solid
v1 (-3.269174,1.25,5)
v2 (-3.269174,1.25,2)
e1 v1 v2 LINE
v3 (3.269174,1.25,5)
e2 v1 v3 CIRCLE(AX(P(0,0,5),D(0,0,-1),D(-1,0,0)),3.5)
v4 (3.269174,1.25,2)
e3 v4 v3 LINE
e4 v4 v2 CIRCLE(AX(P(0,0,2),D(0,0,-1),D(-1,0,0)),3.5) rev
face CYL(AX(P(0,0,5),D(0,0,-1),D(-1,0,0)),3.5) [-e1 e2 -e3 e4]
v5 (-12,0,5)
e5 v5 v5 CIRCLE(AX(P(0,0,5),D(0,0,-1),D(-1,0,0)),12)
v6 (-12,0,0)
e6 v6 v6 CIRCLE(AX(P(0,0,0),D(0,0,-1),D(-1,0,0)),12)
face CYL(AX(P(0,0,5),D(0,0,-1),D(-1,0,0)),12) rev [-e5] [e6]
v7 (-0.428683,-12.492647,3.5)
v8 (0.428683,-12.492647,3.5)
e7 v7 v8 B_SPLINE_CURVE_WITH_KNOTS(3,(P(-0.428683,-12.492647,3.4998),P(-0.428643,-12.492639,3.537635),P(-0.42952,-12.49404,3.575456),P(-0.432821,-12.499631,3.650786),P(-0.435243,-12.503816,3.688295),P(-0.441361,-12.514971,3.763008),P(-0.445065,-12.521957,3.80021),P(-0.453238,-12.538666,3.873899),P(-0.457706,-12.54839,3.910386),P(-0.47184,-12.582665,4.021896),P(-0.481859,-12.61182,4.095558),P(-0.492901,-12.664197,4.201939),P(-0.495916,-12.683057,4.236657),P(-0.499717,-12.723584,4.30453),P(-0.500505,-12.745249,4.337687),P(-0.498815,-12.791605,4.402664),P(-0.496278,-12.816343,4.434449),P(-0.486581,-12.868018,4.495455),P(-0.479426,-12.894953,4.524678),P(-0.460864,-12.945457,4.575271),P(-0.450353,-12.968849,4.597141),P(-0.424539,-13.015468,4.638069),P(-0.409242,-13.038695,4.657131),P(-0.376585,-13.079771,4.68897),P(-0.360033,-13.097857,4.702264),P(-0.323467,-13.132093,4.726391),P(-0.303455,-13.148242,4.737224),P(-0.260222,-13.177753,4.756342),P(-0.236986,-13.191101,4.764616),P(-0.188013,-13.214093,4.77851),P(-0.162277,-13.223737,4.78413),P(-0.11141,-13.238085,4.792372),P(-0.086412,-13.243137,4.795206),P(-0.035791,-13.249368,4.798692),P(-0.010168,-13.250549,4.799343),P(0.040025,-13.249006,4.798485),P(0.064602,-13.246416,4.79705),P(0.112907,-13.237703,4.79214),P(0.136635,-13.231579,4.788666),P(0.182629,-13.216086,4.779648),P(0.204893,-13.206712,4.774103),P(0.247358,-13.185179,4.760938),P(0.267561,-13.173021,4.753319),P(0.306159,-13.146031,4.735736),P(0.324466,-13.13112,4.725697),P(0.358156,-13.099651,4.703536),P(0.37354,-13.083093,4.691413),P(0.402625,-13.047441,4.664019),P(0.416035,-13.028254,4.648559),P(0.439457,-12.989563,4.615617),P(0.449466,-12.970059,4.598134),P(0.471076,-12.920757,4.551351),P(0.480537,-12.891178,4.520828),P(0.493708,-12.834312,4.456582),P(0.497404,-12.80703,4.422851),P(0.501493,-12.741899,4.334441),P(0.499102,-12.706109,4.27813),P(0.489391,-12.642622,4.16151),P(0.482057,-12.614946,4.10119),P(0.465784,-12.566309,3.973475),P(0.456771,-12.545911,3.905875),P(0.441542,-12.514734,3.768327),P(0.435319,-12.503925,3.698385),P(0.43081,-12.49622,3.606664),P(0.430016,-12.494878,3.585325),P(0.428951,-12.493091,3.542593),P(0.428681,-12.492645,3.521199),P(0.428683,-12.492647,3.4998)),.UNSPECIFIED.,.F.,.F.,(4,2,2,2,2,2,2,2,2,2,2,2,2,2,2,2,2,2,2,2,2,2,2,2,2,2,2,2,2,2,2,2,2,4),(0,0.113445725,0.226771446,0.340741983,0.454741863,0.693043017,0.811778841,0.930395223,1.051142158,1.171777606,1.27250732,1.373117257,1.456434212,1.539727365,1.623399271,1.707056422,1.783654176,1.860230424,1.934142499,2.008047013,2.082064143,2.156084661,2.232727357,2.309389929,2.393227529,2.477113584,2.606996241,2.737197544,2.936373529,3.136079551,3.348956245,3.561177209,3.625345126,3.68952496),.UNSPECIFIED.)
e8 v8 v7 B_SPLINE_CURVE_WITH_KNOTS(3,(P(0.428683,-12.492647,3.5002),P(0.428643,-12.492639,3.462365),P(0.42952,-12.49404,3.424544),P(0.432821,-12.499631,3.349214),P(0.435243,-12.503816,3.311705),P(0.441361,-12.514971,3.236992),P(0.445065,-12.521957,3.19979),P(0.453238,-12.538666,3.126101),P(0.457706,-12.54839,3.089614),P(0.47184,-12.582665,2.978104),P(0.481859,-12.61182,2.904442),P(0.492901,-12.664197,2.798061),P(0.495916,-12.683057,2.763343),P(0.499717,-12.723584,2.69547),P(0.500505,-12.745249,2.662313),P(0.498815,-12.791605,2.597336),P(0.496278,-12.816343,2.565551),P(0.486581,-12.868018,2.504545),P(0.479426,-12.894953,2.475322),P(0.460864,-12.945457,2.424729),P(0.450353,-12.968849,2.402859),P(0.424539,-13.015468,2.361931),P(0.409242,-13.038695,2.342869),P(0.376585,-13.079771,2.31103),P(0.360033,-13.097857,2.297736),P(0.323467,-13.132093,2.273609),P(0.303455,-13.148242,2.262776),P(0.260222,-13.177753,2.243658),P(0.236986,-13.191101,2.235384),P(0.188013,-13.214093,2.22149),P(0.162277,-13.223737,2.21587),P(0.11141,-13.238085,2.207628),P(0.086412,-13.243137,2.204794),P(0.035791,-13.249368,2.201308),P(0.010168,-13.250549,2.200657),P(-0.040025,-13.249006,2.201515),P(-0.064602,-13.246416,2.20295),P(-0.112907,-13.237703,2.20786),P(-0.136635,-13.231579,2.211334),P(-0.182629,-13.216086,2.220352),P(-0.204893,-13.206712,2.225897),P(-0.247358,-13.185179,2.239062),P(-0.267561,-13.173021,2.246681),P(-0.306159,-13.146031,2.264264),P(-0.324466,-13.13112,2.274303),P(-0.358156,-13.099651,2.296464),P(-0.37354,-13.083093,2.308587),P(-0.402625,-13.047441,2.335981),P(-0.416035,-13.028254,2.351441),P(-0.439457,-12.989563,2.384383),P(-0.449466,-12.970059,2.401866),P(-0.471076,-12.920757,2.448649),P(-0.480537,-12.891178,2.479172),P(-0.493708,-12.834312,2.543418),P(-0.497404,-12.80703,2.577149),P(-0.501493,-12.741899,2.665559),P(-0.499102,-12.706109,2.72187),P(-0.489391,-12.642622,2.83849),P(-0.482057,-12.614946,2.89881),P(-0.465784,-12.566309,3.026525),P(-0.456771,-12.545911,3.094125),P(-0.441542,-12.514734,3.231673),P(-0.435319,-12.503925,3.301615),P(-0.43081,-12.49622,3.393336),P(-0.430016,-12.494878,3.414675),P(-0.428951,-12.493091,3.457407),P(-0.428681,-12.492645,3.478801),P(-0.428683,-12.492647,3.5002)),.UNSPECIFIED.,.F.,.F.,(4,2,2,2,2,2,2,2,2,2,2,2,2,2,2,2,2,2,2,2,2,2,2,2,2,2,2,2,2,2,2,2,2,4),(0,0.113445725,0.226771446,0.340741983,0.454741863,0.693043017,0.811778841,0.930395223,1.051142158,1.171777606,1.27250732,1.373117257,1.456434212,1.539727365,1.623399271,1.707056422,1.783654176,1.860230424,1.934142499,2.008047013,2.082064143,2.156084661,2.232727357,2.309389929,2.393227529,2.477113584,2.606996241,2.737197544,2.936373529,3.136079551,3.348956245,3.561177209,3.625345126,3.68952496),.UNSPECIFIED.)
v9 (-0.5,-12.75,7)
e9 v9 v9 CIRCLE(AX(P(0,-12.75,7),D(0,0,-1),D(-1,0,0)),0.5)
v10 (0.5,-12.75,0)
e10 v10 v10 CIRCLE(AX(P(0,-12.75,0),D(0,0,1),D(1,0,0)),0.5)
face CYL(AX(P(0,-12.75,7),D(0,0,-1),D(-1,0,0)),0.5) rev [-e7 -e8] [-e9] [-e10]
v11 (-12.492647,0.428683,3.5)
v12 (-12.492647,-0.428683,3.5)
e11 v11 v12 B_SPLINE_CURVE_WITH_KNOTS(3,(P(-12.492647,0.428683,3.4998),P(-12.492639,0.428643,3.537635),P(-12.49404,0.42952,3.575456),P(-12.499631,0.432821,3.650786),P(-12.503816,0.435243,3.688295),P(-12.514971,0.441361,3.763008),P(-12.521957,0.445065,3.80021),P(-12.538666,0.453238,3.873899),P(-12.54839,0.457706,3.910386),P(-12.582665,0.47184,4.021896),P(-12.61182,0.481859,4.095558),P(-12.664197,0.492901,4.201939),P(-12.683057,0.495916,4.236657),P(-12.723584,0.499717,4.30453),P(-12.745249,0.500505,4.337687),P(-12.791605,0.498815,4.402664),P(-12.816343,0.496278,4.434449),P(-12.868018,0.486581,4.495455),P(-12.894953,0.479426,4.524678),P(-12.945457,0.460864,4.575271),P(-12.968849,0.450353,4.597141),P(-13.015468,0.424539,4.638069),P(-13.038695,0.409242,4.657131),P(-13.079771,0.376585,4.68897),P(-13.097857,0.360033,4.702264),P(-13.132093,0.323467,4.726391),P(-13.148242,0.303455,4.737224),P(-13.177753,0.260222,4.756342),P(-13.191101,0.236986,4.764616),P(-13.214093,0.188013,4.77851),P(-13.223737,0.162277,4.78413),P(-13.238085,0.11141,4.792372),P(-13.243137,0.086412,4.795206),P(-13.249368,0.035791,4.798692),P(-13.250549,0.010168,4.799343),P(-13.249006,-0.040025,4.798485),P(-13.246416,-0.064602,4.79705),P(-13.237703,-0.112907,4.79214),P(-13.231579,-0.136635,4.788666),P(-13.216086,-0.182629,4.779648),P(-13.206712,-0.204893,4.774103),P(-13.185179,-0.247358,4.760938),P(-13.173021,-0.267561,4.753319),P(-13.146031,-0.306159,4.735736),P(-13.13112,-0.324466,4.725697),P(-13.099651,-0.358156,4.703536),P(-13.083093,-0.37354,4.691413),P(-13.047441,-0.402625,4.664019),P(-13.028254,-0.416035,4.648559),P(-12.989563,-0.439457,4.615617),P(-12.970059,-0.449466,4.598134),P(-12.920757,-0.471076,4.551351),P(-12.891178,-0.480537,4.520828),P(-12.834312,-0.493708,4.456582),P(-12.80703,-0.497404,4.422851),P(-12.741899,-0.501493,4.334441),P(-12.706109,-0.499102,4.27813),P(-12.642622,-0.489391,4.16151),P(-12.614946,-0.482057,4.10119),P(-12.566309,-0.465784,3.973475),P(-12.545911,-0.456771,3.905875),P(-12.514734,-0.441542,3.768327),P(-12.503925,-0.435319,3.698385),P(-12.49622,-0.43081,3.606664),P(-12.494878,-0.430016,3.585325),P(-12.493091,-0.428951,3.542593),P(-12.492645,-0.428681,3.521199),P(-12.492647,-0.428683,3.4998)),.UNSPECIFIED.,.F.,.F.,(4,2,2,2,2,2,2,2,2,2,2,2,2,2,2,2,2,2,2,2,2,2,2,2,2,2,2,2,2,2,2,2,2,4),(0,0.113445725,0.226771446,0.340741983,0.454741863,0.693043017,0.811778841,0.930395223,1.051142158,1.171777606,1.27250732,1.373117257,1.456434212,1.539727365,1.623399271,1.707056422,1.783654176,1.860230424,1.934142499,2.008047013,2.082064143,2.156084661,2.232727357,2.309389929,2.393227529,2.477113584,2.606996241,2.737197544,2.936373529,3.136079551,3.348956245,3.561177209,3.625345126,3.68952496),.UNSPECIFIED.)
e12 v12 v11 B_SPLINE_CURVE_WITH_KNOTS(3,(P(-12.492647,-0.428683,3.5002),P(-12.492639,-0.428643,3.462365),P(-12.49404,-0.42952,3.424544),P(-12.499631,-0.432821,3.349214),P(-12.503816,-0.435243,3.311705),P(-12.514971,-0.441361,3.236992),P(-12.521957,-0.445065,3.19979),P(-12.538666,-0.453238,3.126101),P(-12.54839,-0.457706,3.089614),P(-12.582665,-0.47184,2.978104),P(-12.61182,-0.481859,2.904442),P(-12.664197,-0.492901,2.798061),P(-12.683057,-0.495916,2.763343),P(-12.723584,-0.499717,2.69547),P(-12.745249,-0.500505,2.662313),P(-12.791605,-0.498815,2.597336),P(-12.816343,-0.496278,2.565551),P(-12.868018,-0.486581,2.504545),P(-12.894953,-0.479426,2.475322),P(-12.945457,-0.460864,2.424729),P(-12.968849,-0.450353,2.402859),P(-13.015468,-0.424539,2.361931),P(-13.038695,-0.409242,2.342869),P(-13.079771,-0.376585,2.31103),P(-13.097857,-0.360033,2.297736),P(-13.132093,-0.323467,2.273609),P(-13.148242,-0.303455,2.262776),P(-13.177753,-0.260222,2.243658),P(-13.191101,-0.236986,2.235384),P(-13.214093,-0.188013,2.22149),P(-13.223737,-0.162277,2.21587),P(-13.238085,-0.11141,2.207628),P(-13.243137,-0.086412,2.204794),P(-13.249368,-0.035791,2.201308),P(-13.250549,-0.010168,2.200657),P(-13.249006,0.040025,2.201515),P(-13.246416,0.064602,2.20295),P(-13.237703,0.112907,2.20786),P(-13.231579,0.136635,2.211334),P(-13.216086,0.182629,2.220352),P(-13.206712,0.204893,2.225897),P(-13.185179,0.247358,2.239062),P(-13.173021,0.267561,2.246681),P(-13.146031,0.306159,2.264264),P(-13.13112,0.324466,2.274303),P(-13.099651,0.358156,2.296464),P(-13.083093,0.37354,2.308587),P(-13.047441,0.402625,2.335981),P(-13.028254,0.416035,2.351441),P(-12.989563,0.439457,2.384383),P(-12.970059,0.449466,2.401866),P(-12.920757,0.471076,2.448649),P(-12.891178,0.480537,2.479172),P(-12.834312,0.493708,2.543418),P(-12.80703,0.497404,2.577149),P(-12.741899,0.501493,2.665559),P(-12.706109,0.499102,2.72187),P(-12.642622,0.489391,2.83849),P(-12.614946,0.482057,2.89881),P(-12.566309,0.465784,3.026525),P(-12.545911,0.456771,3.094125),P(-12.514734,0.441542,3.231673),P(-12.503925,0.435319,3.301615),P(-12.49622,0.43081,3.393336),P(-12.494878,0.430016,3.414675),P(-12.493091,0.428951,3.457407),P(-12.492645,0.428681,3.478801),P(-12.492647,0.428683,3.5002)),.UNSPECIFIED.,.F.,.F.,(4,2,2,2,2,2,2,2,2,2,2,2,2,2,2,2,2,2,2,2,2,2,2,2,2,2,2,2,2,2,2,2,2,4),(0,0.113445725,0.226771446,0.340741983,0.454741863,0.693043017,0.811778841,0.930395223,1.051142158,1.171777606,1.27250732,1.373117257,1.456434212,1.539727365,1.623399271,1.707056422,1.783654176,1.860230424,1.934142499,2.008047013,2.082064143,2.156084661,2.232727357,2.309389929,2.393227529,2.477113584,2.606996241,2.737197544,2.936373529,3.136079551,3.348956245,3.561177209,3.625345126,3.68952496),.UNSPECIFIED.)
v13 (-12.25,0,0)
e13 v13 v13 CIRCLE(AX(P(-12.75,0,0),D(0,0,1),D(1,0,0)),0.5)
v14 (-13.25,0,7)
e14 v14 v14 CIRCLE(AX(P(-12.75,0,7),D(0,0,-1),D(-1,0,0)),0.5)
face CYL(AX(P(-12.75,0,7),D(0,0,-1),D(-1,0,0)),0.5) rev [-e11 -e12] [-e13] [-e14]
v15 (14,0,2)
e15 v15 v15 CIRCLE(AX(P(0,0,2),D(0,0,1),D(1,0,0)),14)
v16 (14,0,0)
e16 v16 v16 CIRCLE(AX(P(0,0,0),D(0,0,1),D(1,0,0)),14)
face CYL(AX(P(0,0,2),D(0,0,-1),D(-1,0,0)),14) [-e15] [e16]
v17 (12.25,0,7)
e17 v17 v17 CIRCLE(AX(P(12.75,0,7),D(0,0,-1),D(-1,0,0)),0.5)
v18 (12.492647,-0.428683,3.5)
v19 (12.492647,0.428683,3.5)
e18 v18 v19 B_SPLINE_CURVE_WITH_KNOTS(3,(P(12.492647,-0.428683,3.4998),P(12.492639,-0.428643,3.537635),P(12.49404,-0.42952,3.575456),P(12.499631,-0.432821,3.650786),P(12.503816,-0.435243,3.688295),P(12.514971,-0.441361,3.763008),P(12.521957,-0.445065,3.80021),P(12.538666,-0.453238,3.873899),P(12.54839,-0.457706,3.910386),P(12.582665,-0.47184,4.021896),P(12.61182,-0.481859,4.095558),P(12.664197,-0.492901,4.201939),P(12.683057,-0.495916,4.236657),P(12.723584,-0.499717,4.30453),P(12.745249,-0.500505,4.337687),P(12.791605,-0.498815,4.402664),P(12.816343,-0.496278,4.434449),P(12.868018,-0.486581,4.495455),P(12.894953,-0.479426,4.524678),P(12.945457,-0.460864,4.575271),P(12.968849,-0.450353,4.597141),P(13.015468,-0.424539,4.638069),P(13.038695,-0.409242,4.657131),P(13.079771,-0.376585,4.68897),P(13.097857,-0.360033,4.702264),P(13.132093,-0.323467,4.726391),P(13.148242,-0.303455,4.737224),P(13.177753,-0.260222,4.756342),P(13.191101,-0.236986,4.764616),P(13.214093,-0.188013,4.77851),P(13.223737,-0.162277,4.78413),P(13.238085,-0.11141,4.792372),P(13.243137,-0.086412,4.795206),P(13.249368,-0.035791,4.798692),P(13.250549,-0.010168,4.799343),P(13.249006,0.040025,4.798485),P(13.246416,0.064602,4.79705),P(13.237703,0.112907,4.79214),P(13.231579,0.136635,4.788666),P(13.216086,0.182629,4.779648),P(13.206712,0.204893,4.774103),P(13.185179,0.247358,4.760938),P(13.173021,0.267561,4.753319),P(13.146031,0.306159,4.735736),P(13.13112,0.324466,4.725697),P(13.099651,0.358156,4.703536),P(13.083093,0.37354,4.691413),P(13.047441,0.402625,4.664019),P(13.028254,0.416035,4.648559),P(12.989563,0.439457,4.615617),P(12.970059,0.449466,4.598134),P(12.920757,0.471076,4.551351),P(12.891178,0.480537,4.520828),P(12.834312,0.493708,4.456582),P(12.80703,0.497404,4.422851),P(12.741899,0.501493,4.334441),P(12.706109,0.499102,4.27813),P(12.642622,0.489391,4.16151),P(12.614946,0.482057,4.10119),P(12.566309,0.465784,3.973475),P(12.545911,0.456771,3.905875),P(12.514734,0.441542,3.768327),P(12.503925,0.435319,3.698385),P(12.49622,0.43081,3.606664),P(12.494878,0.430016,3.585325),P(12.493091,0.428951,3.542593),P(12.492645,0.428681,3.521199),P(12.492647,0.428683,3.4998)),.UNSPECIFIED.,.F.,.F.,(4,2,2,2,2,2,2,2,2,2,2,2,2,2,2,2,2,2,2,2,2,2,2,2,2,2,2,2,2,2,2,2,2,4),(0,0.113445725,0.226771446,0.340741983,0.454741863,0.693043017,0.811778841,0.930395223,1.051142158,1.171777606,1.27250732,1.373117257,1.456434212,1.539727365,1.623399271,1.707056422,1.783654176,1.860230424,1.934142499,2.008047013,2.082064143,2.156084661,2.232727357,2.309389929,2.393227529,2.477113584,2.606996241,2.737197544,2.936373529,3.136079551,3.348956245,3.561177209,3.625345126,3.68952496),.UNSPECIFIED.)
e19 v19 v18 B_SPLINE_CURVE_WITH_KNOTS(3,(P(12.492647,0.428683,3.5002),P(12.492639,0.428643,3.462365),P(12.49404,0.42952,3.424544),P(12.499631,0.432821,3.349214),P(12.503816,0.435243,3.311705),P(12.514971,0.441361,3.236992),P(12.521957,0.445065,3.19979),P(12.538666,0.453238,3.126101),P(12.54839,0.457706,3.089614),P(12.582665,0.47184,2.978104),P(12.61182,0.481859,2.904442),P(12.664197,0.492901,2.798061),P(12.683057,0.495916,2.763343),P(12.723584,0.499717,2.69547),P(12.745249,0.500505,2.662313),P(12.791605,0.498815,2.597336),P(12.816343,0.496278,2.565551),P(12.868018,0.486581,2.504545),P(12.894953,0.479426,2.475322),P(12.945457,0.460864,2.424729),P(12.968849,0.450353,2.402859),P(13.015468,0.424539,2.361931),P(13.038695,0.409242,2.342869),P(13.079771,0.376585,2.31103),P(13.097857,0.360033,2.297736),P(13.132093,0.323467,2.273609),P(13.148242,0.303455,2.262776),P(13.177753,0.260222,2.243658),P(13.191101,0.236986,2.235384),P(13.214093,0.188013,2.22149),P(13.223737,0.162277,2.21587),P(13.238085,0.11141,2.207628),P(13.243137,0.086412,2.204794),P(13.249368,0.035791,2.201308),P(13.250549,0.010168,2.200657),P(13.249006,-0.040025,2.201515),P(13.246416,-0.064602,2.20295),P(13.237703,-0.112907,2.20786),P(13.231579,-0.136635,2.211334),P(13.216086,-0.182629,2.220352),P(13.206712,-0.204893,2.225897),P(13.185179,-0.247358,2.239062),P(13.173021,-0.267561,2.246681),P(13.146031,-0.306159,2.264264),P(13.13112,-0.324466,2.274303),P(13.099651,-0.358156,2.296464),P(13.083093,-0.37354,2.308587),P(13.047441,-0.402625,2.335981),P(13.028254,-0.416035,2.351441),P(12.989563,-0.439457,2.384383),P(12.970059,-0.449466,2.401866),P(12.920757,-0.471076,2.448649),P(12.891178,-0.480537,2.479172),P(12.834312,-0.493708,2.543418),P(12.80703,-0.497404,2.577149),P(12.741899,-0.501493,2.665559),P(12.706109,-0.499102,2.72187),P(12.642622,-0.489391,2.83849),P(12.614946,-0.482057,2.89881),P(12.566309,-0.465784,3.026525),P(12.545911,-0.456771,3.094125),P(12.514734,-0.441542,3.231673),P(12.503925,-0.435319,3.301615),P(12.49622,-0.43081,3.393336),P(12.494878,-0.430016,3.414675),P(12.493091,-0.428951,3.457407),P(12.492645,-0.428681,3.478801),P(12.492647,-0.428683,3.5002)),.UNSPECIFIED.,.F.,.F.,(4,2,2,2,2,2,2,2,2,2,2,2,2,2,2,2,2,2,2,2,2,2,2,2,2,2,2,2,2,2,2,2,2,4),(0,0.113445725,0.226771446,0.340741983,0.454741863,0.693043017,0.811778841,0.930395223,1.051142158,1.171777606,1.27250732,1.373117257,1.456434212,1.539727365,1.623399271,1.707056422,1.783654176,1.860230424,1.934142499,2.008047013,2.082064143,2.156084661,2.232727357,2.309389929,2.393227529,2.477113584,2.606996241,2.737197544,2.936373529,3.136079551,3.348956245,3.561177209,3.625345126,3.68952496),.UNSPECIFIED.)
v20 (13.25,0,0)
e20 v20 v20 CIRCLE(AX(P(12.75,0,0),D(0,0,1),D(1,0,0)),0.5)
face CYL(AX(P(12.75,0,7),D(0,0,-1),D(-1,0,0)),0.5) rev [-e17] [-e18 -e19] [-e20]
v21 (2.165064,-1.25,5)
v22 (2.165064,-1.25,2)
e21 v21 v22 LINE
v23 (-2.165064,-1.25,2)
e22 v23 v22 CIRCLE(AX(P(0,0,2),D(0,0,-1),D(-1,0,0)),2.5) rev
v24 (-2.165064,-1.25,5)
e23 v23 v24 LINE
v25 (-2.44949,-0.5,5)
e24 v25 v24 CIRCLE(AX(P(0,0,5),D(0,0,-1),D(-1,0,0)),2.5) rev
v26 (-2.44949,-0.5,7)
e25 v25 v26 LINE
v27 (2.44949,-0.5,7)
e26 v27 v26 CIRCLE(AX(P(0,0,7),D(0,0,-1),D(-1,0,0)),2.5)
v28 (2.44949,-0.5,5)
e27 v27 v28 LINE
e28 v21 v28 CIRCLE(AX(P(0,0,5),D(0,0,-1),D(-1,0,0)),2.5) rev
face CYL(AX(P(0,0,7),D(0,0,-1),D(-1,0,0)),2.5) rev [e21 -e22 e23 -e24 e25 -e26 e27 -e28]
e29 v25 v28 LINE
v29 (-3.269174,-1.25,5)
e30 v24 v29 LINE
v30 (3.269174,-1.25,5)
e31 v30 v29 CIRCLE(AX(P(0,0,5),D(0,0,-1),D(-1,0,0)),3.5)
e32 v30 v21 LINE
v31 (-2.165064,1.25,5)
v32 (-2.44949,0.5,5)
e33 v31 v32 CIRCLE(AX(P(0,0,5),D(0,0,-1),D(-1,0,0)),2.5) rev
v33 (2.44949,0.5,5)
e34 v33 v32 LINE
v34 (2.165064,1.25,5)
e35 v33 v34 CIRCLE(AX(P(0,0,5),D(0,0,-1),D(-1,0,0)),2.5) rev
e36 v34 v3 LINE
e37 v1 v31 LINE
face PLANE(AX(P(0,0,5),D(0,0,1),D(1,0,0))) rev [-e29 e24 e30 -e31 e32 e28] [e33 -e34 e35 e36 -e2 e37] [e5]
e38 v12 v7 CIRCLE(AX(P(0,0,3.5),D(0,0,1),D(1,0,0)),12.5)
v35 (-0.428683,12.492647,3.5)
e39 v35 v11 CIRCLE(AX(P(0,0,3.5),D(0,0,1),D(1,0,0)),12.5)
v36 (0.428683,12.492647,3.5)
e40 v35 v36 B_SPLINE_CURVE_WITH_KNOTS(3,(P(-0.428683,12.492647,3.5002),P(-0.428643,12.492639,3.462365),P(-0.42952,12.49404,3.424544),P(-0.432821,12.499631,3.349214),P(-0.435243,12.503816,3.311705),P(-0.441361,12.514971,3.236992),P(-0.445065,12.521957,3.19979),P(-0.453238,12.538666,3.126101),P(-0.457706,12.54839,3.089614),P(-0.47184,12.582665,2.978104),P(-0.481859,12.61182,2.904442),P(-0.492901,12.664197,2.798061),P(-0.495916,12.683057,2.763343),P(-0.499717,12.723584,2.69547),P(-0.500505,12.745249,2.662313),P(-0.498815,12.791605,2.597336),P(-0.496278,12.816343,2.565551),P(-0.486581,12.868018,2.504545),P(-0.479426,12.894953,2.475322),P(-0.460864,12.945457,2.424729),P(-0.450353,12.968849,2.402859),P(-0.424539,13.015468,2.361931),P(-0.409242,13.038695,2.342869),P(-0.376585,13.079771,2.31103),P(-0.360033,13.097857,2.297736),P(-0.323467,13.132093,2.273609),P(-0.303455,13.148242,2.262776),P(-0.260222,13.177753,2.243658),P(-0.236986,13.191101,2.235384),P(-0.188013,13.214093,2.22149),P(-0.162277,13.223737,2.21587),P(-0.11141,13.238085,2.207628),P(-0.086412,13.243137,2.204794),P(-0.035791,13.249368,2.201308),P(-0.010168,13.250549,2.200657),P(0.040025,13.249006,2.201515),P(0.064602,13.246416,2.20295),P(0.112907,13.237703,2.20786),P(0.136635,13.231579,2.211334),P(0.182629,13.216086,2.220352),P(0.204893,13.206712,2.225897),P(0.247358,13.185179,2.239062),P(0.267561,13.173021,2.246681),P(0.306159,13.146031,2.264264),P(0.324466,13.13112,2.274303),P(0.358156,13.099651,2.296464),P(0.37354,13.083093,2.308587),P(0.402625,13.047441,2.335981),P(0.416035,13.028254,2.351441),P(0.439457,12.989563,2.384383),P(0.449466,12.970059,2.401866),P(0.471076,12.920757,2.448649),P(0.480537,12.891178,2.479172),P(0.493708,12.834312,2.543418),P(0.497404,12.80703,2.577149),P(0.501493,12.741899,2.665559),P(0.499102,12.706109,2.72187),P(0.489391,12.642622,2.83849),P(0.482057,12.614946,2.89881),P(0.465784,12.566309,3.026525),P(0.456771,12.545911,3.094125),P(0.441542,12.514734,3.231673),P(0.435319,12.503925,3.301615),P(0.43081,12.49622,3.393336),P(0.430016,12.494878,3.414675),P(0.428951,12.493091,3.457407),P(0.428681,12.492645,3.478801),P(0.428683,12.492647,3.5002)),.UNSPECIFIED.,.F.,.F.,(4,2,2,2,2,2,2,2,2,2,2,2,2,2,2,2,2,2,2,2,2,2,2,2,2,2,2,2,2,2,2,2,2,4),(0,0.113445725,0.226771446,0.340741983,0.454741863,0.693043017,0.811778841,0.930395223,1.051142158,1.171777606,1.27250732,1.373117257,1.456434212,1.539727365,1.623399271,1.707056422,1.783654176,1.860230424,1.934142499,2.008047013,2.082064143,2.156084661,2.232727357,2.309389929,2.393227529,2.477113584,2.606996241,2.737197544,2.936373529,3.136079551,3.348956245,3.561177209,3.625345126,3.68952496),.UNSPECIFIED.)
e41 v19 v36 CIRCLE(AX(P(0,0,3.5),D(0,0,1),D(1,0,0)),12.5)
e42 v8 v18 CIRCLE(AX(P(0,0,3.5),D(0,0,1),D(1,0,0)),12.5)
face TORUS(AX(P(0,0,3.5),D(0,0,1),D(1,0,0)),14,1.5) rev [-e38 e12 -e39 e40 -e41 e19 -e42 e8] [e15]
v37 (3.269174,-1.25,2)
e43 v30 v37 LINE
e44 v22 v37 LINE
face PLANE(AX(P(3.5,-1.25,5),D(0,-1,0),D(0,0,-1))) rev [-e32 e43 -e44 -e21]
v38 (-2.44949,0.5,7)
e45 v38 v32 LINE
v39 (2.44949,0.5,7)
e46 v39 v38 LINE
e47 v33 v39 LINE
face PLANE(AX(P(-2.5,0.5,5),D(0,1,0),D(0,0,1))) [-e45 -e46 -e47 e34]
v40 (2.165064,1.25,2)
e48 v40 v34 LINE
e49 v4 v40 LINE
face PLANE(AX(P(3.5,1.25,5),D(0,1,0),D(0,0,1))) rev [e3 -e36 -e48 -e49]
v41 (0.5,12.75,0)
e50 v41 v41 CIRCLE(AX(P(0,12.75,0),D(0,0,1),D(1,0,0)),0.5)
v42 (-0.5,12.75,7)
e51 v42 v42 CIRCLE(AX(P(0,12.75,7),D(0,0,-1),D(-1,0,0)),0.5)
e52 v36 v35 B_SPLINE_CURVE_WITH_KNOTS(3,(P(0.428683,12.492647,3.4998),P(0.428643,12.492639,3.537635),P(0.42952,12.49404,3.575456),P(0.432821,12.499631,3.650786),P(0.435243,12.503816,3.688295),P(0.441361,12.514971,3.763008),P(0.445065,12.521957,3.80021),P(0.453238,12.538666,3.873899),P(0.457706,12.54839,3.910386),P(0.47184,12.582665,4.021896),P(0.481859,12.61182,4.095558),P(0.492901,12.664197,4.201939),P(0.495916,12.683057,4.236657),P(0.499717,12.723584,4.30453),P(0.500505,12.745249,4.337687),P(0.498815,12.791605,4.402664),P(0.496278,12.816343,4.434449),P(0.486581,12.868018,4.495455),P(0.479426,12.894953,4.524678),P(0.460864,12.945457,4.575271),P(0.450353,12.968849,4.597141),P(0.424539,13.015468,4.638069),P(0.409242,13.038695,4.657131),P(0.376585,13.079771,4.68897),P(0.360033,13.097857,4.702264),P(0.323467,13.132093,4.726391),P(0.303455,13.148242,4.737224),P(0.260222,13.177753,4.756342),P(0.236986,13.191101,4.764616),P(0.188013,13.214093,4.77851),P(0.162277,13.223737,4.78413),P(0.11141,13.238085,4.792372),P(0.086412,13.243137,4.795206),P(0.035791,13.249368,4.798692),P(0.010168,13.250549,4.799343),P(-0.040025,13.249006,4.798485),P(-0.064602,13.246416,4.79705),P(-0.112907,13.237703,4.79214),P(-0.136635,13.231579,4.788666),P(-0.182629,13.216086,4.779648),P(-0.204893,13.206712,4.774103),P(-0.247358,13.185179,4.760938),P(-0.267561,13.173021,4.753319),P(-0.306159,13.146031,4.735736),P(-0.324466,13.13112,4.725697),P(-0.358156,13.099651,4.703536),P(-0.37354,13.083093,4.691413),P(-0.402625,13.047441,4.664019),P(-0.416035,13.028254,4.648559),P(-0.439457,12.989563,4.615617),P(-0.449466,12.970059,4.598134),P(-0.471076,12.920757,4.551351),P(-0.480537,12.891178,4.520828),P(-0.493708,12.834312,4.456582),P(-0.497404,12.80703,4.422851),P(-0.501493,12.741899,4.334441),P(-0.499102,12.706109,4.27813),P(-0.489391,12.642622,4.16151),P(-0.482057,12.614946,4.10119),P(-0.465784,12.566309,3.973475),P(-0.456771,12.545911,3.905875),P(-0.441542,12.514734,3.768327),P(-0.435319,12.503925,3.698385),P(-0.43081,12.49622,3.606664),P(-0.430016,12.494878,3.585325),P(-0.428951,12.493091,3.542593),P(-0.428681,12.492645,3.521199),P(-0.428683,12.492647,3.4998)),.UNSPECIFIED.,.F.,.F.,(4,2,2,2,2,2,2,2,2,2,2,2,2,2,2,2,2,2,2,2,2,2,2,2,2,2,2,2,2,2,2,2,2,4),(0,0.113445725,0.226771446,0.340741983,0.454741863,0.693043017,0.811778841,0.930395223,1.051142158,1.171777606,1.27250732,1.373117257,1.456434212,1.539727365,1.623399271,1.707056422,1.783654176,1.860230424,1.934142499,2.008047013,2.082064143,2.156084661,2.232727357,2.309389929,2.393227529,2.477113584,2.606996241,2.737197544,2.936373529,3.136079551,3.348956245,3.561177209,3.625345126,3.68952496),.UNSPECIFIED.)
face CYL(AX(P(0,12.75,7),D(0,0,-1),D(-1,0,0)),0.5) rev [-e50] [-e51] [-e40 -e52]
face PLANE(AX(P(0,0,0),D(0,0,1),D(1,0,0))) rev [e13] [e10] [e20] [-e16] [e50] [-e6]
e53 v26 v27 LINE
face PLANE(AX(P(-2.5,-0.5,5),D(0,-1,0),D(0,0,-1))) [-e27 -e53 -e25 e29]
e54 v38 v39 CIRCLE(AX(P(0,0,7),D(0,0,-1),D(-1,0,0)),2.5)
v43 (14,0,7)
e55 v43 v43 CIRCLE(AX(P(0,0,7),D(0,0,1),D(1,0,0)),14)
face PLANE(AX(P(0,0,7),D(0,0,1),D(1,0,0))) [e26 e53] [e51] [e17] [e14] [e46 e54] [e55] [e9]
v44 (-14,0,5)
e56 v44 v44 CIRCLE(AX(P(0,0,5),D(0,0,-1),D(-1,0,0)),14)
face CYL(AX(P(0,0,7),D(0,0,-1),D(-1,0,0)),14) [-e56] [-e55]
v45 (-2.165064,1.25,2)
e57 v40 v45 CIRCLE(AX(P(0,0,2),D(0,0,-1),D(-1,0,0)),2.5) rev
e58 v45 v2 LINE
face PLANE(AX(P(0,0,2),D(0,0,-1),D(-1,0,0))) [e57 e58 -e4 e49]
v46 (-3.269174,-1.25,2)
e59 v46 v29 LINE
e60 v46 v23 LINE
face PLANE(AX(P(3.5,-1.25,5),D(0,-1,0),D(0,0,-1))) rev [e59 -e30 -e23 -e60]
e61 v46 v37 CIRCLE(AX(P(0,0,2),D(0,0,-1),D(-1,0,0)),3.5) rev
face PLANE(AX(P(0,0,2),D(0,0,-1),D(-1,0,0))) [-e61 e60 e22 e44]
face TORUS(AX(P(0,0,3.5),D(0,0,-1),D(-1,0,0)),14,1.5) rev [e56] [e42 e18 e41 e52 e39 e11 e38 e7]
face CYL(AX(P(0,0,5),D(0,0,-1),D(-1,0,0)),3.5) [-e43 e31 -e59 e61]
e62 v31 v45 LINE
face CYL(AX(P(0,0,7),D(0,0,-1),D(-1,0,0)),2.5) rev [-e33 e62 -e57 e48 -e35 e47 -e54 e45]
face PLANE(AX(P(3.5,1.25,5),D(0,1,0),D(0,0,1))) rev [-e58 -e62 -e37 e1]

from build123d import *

# Parameters (mm, degrees)
SKETCH1_R               = 14
BOSS_EXTRUDE1_DEPTH     = 7
SKETCH3_R               = 2.5
CUT_EXTRUDE1_DEPTH      = 22
SKETCH4_W               = 5
SKETCH4_H               = 1
BOSS_EXTRUDE2_DEPTH     = 2
SKETCH5_R               = 12
SKETCH5_R_2             = 3.5
CUT_EXTRUDE2_DEPTH      = 5
SKETCH6_W               = 7
SKETCH6_H               = 2.5
CUT_EXTRUDE3_DEPTH      = 5
SKETCH7_R               = 14
SKETCH7_R_2             = 12.5
CUT_EXTRUDE4_DEPTH      = 5
SKETCH8_R               = 14
SKETCH8_R_2             = 12.5
BOSS_EXTRUDE3_DEPTH     = 2
FILLET1_R               = 1.5
CUT_EXTRUDE7_DEPTH      = 22
CUT_EXTRUDE7_DEPTH_BACK = 22
SKETCH9_R               = 0.5
SKETCH10_W              = 6.874413596
SKETCH10_H              = 7.54594332
CUT_EXTRUDE8_DEPTH      = 2


with BuildPart() as part:
    # Sketch1 → Boss-Extrude1 (new body)
    with BuildSketch(Plane.XY):
        Circle(SKETCH1_R)
    extrude(amount=BOSS_EXTRUDE1_DEPTH)

    # Sketch3 → Cut-Extrude1 (cut, through all)
    with BuildSketch(Plane(origin=(0, 0, 0), x_dir=(-1, 0, 0), z_dir=(0, 0, -1))):
        Circle(SKETCH3_R)
    extrude(amount=-CUT_EXTRUDE1_DEPTH, mode=Mode.SUBTRACT)

    # Sketch4 → Boss-Extrude2 (add)
    with BuildSketch(Plane.XY.offset(7)):
        Rectangle(SKETCH4_W, SKETCH4_H)
    extrude(amount=-BOSS_EXTRUDE2_DEPTH)

    # Sketch5 → Cut-Extrude2 (cut)
    with BuildSketch(Plane(origin=(0, 0, 0), x_dir=(-1, 0, 0), z_dir=(0, 0, -1))):
        Circle(SKETCH5_R)
        Circle(SKETCH5_R_2, mode=Mode.SUBTRACT)
    extrude(amount=-CUT_EXTRUDE2_DEPTH, mode=Mode.SUBTRACT)

    # Sketch6 → Cut-Extrude3 (cut)
    with BuildSketch(Plane(origin=(0, 0, 0), x_dir=(-1, 0, 0), z_dir=(0, 0, -1))):
        Rectangle(SKETCH6_W, SKETCH6_H)
    extrude(amount=-CUT_EXTRUDE3_DEPTH, mode=Mode.SUBTRACT)

    # Sketch7 → Cut-Extrude4 (cut)
    with BuildSketch(Plane(origin=(0, 0, 0), x_dir=(-1, 0, 0), z_dir=(0, 0, -1))):
        Circle(SKETCH7_R)
        Circle(SKETCH7_R_2, mode=Mode.SUBTRACT)
    extrude(amount=-CUT_EXTRUDE4_DEPTH, mode=Mode.SUBTRACT)

    # Sketch8 → Boss-Extrude3 (add)
    with BuildSketch(Plane.XY):
        with Locations(Location((0, 0, 0), (0, 0, 180))):
            Circle(SKETCH8_R)
        with Locations(Location((0, 0, 0), (0, 0, 180))):
            Circle(SKETCH8_R_2, mode=Mode.SUBTRACT)
    extrude(amount=BOSS_EXTRUDE3_DEPTH)

    # Fillet1
    fillet1_edges = [part.edges().sort_by_distance(p)[0] for p in [
        (12.5, 0, 5),
        (12.5, 0, 2),
    ]]
    fillet(fillet1_edges, radius=FILLET1_R - 0.0001)  # a hair under: the kernel refuses the full size

    # Sketch9 → Cut-Extrude7 (cut, two sides: drawn at the far end of the back side and taken through both)
    with BuildSketch(Plane(origin=(0, 0, 0), x_dir=(-1, 0, 0), z_dir=(0, 0, -1)).offset(-CUT_EXTRUDE7_DEPTH_BACK)):
        with Locations((-12.75, 0)):
            Circle(SKETCH9_R)
        with Locations((12.75, 0)):
            Circle(SKETCH9_R)
        with Locations((0, 12.75)):
            Circle(SKETCH9_R)
        with Locations((0, -12.75)):
            Circle(SKETCH9_R)
    extrude(amount=CUT_EXTRUDE7_DEPTH + CUT_EXTRUDE7_DEPTH_BACK, mode=Mode.SUBTRACT)

    # Sketch10 → Cut-Extrude8 (cut)
    with BuildSketch(Plane(origin=(0, 0, 0), x_dir=(-1, 0, 0), z_dir=(0, 0, -1))):
        with Locations((0.008465514, -0.14973146)):
            Rectangle(SKETCH10_W, SKETCH10_H)
    extrude(amount=-CUT_EXTRUDE8_DEPTH, mode=Mode.SUBTRACT)


solid = part.part
